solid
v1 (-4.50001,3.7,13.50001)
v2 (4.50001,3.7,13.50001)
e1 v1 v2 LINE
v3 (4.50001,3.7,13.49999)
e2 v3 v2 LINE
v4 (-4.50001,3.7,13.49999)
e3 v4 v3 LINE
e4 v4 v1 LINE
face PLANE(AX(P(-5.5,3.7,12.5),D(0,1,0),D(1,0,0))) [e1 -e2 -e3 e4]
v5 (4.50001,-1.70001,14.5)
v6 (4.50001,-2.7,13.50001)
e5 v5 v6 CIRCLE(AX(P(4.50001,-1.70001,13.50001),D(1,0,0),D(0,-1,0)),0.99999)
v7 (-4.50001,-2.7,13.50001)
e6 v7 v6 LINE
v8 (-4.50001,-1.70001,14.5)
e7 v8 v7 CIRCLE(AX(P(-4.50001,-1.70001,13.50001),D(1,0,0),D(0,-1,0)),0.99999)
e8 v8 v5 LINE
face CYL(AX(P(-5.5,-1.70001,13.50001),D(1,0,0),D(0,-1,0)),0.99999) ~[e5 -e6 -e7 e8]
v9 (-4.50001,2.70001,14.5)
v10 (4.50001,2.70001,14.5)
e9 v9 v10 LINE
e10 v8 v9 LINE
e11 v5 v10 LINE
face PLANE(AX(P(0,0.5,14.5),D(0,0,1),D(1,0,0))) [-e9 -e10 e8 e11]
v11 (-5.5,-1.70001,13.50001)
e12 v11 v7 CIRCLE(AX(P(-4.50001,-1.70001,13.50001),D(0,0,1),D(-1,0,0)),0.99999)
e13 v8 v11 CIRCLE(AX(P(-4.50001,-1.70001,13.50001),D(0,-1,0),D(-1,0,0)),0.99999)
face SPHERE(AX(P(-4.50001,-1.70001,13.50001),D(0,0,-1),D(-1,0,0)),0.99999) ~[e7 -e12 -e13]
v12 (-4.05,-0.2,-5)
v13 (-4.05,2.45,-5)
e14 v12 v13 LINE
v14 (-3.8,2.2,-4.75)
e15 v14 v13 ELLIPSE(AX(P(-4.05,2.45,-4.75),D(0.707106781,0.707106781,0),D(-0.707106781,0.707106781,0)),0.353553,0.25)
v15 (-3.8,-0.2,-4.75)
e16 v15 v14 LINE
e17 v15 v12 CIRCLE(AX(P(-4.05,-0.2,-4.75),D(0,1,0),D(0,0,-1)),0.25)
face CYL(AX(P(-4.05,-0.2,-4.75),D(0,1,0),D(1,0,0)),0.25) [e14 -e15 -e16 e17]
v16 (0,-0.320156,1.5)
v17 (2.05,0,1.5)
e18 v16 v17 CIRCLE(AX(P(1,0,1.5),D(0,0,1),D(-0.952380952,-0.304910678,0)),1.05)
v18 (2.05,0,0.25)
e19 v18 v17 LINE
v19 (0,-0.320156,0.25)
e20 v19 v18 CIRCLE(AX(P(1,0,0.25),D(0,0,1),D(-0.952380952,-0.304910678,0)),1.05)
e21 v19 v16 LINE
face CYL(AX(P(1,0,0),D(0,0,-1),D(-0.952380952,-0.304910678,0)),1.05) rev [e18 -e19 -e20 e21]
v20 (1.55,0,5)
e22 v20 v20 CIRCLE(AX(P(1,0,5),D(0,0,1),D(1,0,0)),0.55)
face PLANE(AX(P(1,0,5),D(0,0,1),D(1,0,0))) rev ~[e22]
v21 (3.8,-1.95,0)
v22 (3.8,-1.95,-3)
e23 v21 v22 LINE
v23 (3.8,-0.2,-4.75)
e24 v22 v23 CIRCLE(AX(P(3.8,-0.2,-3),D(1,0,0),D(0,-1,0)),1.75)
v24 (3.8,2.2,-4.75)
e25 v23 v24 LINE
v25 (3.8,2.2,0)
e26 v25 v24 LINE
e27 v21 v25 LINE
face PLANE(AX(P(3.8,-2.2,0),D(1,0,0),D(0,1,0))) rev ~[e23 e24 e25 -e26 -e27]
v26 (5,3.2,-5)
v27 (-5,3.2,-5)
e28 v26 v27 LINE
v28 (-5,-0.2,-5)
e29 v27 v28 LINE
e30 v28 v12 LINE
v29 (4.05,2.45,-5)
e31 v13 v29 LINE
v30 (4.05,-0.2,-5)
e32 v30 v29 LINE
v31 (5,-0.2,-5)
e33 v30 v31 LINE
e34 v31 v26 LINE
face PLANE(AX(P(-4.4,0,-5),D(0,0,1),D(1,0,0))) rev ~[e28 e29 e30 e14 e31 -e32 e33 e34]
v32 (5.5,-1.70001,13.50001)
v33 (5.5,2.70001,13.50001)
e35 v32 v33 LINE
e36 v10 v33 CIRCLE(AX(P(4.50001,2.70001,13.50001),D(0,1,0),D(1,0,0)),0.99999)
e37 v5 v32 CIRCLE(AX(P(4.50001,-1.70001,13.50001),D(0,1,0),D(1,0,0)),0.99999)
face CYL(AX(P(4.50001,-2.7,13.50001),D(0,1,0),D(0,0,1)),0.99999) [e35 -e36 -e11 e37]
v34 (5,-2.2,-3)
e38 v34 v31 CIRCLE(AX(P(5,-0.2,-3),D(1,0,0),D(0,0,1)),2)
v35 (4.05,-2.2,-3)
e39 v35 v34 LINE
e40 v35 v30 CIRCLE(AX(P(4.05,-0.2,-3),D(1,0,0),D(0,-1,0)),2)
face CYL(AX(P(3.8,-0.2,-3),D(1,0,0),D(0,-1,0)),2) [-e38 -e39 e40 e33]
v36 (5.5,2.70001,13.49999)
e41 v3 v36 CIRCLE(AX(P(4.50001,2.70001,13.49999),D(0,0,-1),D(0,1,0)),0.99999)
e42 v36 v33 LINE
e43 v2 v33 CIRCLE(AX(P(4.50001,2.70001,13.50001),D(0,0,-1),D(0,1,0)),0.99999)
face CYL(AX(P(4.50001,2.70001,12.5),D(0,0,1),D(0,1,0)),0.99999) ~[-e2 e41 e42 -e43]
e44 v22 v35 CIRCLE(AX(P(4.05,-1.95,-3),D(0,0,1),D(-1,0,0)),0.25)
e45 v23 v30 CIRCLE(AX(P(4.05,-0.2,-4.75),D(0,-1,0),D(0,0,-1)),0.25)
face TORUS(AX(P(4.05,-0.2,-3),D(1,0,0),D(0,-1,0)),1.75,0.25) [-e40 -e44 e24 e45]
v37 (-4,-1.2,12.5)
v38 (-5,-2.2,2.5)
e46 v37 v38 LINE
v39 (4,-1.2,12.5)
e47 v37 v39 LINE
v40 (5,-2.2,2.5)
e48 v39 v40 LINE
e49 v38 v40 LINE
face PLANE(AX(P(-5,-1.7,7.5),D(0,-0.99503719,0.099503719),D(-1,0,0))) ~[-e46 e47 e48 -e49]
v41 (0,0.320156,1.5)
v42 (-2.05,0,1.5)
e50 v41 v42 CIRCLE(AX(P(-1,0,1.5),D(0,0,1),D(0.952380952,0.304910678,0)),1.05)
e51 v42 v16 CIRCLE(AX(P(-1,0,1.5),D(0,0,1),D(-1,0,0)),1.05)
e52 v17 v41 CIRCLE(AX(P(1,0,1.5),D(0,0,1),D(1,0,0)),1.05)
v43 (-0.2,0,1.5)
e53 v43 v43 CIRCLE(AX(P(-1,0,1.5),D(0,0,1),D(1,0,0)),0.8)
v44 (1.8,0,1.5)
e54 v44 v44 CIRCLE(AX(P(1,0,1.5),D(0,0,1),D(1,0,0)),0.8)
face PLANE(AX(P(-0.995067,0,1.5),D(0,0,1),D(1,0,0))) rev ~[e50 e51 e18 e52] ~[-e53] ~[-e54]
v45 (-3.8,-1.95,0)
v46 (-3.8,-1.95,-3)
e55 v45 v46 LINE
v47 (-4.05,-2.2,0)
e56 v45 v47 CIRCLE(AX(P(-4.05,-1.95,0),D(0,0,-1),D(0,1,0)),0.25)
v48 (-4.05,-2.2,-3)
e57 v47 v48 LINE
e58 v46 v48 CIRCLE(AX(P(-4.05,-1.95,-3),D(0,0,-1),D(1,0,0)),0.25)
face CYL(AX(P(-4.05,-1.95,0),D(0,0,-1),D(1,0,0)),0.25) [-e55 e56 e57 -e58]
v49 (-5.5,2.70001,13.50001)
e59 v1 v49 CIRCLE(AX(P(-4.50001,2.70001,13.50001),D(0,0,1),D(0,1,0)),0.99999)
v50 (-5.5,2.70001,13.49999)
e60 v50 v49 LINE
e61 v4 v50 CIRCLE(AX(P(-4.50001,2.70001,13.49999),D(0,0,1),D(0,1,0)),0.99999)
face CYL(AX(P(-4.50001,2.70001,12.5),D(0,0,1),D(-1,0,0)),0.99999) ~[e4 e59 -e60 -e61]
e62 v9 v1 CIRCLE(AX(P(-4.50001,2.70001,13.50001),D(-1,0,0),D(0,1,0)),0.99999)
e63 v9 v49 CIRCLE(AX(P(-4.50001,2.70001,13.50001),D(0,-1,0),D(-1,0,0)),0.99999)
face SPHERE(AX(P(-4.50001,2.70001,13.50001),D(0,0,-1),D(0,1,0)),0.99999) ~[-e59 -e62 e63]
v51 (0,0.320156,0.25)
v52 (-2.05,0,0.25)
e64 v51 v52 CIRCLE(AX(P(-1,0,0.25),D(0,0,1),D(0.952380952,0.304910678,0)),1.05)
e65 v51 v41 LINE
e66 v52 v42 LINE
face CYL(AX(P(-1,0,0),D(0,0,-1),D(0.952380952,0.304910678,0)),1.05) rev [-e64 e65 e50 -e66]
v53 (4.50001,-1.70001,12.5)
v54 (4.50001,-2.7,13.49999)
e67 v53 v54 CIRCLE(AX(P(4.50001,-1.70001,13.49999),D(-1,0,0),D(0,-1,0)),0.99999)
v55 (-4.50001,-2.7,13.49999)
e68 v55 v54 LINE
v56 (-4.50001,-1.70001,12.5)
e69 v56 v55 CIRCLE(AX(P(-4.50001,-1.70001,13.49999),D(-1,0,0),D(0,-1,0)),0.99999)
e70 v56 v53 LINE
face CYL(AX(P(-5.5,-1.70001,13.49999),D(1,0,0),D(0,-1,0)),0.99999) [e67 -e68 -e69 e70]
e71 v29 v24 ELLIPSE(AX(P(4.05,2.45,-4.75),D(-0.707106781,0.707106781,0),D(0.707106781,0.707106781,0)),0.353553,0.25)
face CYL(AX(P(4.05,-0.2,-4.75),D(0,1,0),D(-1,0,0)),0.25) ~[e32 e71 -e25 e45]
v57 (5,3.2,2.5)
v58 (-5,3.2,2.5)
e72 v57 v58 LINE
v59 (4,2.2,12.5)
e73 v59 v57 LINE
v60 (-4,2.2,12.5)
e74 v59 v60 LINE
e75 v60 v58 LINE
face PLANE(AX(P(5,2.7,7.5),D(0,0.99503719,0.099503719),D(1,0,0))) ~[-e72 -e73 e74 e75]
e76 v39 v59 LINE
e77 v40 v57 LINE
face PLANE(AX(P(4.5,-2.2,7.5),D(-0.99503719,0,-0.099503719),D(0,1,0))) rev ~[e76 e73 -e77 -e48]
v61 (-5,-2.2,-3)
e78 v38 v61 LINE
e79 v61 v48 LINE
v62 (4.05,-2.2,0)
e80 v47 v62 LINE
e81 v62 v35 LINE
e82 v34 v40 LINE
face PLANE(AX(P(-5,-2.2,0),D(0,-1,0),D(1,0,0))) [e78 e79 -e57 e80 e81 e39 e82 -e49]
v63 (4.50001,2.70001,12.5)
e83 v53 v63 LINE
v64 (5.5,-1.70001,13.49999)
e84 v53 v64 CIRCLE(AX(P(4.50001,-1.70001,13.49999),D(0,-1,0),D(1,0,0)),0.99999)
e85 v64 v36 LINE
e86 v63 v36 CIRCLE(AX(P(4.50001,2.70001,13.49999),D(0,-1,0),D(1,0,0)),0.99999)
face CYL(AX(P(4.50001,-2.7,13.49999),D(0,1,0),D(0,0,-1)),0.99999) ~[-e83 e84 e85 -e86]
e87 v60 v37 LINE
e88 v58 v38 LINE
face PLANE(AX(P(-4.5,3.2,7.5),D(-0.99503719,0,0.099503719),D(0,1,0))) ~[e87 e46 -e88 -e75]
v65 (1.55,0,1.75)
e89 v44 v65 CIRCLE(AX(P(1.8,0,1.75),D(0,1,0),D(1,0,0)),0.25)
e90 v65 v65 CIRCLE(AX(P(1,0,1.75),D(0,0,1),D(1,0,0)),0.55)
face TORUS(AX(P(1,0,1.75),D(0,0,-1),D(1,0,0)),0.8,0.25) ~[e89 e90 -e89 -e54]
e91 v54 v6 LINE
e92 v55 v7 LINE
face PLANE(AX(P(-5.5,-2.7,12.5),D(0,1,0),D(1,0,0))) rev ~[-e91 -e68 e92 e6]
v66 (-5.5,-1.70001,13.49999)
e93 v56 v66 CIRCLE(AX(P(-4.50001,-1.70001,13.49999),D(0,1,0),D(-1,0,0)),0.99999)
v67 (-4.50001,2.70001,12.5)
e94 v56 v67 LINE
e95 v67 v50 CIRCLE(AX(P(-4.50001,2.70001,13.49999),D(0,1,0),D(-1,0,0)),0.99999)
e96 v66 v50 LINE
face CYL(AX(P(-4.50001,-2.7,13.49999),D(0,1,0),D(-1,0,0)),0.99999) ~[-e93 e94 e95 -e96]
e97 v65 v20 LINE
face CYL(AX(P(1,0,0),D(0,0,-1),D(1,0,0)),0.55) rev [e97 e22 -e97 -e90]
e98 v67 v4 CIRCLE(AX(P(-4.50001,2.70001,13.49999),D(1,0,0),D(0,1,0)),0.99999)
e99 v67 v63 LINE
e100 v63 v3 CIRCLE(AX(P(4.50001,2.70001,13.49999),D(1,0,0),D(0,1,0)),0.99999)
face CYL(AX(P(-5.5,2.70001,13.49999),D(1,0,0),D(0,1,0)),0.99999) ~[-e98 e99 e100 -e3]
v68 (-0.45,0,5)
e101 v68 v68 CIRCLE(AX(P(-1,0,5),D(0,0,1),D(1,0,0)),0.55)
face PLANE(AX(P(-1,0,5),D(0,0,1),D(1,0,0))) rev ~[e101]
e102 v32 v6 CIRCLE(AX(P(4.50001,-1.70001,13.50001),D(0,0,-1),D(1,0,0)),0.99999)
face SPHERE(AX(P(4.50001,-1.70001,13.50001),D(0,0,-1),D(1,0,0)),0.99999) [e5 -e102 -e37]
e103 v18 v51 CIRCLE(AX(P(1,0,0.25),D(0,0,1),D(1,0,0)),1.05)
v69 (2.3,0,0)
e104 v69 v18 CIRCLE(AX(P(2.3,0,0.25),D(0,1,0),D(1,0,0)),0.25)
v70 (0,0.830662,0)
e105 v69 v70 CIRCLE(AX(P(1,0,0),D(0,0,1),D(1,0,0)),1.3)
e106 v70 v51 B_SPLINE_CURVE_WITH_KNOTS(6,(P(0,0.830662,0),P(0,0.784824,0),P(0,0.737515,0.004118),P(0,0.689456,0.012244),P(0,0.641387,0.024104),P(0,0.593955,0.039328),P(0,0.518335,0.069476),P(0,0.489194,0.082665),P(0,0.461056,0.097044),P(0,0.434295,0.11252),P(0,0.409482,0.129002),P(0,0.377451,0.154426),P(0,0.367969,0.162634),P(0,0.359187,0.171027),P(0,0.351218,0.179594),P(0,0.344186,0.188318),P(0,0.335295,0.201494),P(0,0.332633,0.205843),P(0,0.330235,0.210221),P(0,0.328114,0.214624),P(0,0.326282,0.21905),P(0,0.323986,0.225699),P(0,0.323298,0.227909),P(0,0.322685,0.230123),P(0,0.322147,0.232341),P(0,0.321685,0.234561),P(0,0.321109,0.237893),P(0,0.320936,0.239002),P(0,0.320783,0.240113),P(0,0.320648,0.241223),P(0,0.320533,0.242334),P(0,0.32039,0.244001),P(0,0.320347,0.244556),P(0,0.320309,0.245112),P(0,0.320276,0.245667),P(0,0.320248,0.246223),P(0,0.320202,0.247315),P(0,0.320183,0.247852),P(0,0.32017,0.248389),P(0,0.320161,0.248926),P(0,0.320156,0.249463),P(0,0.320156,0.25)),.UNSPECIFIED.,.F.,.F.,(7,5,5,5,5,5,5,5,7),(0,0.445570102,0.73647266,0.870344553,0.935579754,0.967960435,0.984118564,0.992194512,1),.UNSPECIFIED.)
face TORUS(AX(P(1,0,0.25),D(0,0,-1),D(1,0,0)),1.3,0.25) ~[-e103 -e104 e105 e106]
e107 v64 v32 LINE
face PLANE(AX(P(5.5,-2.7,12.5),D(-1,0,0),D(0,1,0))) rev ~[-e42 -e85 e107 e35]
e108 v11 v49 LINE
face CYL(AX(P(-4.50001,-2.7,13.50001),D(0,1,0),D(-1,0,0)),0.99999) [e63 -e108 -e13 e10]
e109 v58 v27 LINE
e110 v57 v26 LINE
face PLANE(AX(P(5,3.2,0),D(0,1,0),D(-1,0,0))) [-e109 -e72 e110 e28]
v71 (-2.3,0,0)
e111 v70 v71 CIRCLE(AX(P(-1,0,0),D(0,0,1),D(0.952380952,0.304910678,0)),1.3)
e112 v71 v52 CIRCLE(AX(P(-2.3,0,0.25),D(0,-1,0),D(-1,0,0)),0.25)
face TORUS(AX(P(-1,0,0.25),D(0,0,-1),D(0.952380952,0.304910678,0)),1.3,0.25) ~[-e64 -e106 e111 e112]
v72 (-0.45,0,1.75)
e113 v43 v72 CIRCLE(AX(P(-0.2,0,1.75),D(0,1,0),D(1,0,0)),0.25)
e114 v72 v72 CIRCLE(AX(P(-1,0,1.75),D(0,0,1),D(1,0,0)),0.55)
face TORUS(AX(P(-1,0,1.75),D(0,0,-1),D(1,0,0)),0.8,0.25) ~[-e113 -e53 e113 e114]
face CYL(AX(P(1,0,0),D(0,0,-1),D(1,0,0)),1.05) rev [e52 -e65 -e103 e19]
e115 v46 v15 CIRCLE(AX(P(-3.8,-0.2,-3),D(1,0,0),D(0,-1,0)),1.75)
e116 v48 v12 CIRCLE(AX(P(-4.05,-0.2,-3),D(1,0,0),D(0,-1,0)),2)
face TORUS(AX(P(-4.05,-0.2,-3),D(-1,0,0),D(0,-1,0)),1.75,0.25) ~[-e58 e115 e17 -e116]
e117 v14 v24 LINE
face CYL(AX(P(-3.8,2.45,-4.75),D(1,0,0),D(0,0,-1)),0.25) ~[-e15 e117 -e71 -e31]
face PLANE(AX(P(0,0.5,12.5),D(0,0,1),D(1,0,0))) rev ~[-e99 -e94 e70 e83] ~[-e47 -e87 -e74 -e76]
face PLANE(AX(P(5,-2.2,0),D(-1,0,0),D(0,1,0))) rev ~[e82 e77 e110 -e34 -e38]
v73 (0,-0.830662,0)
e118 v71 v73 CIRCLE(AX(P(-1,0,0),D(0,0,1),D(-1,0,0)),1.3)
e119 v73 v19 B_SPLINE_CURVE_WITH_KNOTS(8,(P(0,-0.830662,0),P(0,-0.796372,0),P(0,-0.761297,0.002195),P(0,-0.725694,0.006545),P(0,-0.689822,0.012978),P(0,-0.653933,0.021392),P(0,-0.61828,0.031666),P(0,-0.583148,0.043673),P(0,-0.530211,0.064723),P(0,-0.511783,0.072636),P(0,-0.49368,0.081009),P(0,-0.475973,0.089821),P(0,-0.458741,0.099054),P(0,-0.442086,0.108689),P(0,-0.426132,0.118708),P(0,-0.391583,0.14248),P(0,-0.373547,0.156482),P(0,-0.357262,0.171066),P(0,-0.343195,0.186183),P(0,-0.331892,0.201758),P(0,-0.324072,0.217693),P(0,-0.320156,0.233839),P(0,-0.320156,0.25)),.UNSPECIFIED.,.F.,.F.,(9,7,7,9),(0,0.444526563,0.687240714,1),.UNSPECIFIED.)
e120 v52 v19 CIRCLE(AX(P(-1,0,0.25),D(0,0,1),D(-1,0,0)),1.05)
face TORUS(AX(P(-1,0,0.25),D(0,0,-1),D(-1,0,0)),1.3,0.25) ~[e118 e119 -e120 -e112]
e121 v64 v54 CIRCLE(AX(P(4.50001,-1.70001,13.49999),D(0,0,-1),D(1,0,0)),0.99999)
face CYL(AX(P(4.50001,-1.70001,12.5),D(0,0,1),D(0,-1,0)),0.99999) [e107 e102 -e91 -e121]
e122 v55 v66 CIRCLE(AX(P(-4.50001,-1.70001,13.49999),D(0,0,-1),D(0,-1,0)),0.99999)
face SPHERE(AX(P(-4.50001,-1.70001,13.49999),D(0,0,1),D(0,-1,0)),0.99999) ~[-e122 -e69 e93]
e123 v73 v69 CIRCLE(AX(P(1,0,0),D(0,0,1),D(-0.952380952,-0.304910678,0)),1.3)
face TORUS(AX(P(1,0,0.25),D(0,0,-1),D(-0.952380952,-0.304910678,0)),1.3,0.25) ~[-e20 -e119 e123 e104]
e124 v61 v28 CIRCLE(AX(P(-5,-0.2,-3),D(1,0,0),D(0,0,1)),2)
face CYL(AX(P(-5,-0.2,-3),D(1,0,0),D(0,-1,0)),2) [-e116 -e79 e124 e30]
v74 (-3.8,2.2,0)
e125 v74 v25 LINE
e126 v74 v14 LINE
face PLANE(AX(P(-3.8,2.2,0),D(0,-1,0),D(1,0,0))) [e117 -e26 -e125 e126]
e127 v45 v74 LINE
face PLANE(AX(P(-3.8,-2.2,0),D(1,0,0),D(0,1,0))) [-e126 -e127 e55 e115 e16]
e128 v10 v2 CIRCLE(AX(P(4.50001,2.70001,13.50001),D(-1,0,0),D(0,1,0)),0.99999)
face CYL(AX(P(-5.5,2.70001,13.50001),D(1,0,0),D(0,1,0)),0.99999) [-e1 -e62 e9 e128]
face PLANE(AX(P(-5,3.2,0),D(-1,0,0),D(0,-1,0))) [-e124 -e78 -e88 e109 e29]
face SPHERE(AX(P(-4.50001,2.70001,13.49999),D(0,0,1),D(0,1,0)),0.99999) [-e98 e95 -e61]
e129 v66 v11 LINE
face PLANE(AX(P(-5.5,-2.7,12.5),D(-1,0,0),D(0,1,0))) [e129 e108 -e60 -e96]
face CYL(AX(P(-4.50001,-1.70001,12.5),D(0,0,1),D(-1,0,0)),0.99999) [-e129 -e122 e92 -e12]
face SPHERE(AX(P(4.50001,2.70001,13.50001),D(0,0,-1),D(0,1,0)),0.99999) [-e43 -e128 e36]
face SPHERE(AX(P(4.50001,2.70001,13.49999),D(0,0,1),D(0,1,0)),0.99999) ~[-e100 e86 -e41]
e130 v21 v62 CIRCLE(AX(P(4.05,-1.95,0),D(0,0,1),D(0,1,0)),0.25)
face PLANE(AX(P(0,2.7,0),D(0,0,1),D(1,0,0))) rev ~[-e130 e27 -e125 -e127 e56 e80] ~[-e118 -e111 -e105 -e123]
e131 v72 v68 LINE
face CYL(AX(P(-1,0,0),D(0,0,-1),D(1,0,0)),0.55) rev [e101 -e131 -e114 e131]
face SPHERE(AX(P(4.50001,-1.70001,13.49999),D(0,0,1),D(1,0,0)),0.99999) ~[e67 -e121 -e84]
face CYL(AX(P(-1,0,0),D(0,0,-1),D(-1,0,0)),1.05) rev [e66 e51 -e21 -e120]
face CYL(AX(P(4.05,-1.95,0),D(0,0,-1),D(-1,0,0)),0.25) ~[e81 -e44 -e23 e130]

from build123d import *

# Parameters (mm, degrees)
F0_W     = 1.2
F0_H     = 4.4
F0_W_2   = 7.6
F0_R     = 0.55
F1_DEPTH = 12.5
F2_DEPTH = 5
F3_DEPTH = 1.5
F4_DEPTH = 5
F5_R     = 2
F6_R     = 0.25
F7_SIZE2 = 10
F7_SIZE  = 1
F8_W     = 11.0000001401
F8_H     = 6.4000001401
F8_W_2   = 8
F8_H_2   = 3.4
F9_DEPTH = 2
F10_R    = 0.99999


# Not quite as in the source:
# - a fillet or chamfer is up to 0.001 mm smaller than in the source, because OpenCascade refuses the exact size


with BuildPart() as f1:
    # F0 (on Top) → F1 (new body)
    with BuildSketch(Plane.XY):
        Polygon((-5, 2.2), (-3.8, 2.2), (3.8, 2.2), (5, 2.2), (5, 3.2), (-5, 3.2), align=None)
        with Locations((-4.4, 0)):
            Rectangle(F0_W, F0_H)
        Rectangle(F0_W_2, F0_H)
        with BuildLine():
            Line((2.05, 1.05), (2.05, 0))
            Line((2.05, 0), (2.05, -1.05))
            ThreePointArc((2.05, -1.05), (2.2267766953, -1.4767766953), (1.8, -1.3))
            Line((1.8, -1.3), (-1.8, -1.3))
            ThreePointArc((-1.8, -1.3), (-2.2267766953, -1.4767766953), (-2.05, -1.05))
            Line((-2.05, -1.05), (-2.05, 0))
            Line((-2.05, 0), (-2.05, 1.05))
            ThreePointArc((-2.05, 1.05), (-2.2267766953, 1.4767766953), (-1.8, 1.3))
            Line((-1.8, 1.3), (1.8, 1.3))
            ThreePointArc((1.8, 1.3), (2.2267766953, 1.4767766953), (2.05, 1.05))
        make_face(mode=Mode.SUBTRACT)
        with Locations((4.4, 0)):
            Rectangle(F0_W, F0_H)
        with BuildLine():
            ThreePointArc((0, 0.3201562119), (1.1620185175, 1.0374246961), (2.05, 0))
            Line((2.05, 0), (2.05, 1.05))
            ThreePointArc((2.05, 1.05), (2.2267766953, 1.4767766953), (1.8, 1.3))
            Line((1.8, 1.3), (-1.8, 1.3))
            ThreePointArc((-1.8, 1.3), (-2.2267766953, 1.4767766953), (-2.05, 1.05))
            Line((-2.05, 1.05), (-2.05, 0))
            ThreePointArc((-2.05, 0), (-1.1620185175, 1.0374246961), (0, 0.3201562119))
        make_face()
        with BuildLine():
            Line((2.05, -1.05), (2.05, 0))
            ThreePointArc((2.05, 0), (1.1620185175, -1.0374246961), (0, -0.3201562119))
            ThreePointArc((0, -0.3201562119), (-1.1620185175, -1.0374246961), (-2.05, 0))
            Line((-2.05, 0), (-2.05, -1.05))
            ThreePointArc((-2.05, -1.05), (-2.2267766953, -1.4767766953), (-1.8, -1.3))
            Line((-1.8, -1.3), (1.8, -1.3))
            ThreePointArc((1.8, -1.3), (2.2267766953, -1.4767766953), (2.05, -1.05))
        make_face()
        with BuildLine():
            ThreePointArc((0, -0.3201562119), (-0.05, 0), (0, 0.3201562119))
            ThreePointArc((0, 0.3201562119), (-1.1620185175, 1.0374246961), (-2.05, 0))
            ThreePointArc((-2.05, 0), (-1.1620185175, -1.0374246961), (0, -0.3201562119))
        make_face()
        with Locations((-1, 0)):
            Circle(F0_R, mode=Mode.SUBTRACT)
        with BuildLine():
            ThreePointArc((0, -0.3201562119), (1.1620185175, -1.0374246961), (2.05, 0))
            ThreePointArc((2.05, 0), (1.1620185175, 1.0374246961), (0, 0.3201562119))
            ThreePointArc((0, 0.3201562119), (0.0374246961, 0.1620185175), (0.05, 0))
            ThreePointArc((0.05, 0), (0.0374246961, -0.1620185175), (0, -0.3201562119))
        make_face()
        with Locations((1, 0)):
            Circle(F0_R, mode=Mode.SUBTRACT)
        with Locations((-1, 0)):
            Circle(F0_R)
        with Locations((1, 0)):
            Circle(F0_R)
        with BuildLine():
            ThreePointArc((0.05, 0), (0.0374246961, 0.1620185175), (0, 0.3201562119))
            ThreePointArc((0, 0.3201562119), (-0.05, 0), (0, -0.3201562119))
            ThreePointArc((0, -0.3201562119), (0.0374246961, -0.1620185175), (0.05, 0))
        make_face()
    extrude(amount=F1_DEPTH)

    # F0 (on Top) → F2 (join)
    with BuildSketch(Plane.XY):
        with Locations((-4.4, 0)):
            Rectangle(F0_W, F0_H)
        with Locations((4.4, 0)):
            Rectangle(F0_W, F0_H)
        Polygon((-5, 2.2), (-3.8, 2.2), (3.8, 2.2), (5, 2.2), (5, 3.2), (-5, 3.2), align=None)
    extrude(amount=-F2_DEPTH)

    # F0 (on Top) → F3 (cut)
    with BuildSketch(Plane.XY):
        with BuildLine():
            ThreePointArc((0, -0.3201562119), (-0.05, 0), (0, 0.3201562119))
            ThreePointArc((0, 0.3201562119), (-1.1620185175, 1.0374246961), (-2.05, 0))
            ThreePointArc((-2.05, 0), (-1.1620185175, -1.0374246961), (0, -0.3201562119))
        make_face()
        with Locations((-1, 0)):
            Circle(F0_R, mode=Mode.SUBTRACT)
        with BuildLine():
            ThreePointArc((0, -0.3201562119), (1.1620185175, -1.0374246961), (2.05, 0))
            ThreePointArc((2.05, 0), (1.1620185175, 1.0374246961), (0, 0.3201562119))
            ThreePointArc((0, 0.3201562119), (0.0374246961, 0.1620185175), (0.05, 0))
            ThreePointArc((0.05, 0), (0.0374246961, -0.1620185175), (0, -0.3201562119))
        make_face()
        with Locations((1, 0)):
            Circle(F0_R, mode=Mode.SUBTRACT)
        with BuildLine():
            ThreePointArc((0.05, 0), (0.0374246961, 0.1620185175), (0, 0.3201562119))
            ThreePointArc((0, 0.3201562119), (-0.05, 0), (0, -0.3201562119))
            ThreePointArc((0, -0.3201562119), (0.0374246961, -0.1620185175), (0.05, 0))
        make_face()
    extrude(amount=F3_DEPTH, mode=Mode.SUBTRACT)

    # F0 (on Top) → F4 (cut)
    with BuildSketch(Plane.XY):
        with Locations((-1, 0)):
            Circle(F0_R)
        with Locations((1, 0)):
            Circle(F0_R)
    extrude(amount=F4_DEPTH, mode=Mode.SUBTRACT)

    # F5
    f5_edges = [f1.edges().sort_by_distance(p)[0] for p in [
        (4.4, -2.2, -5),
        (-4.4, -2.2, -5),
    ]]
    fillet(f5_edges, radius=F5_R)

    # F6
    f6_edges = [f1.edges().sort_by_distance(p)[0] for p in [
        (0.45, 0, 1.5),
        (2.05, 0, 0),
        (-1.55, 0, 1.5),
        (-2.05, 0, 0),
        (-3.8, 1, -5),
        (0, 2.2, -5),
        (3.8, 1, -5),
        (-3.8, -2.2, -1.5),
        (3.8, -2.2, -1.5),
    ]]
    fillet(f6_edges, radius=F6_R)

    # F7
    f7_edges = [f1.edges().sort_by_distance(p)[0] for p in [
        (0, -2.2, 12.5),
        (-5, 0.5, 12.5),
        (5, 0.5, 12.5),
        (0, 3.2, 12.5),
    ]]
    f7_side = f1.faces().sort_by_distance((0, 0.5, 12.5))[0]
    chamfer(f7_edges, length=F7_SIZE, length2=F7_SIZE2, reference=f7_side)

    # F8 (on face) → F9 (join)
    with BuildSketch(Plane.XY.offset(12.5)):
        with Locations((0, 0.5)):
            Rectangle(F8_W, F8_H)
        with Locations((0, 0.5)):
            Rectangle(F8_W_2, F8_H_2, mode=Mode.SUBTRACT)
        with Locations((0, 0.5)):
            Rectangle(F8_W_2, F8_H_2)
    extrude(amount=F9_DEPTH)

    # F10 (radius 1 in the source; OpenCascade refuses exactly that, so slightly less here)
    f10_edges = [f1.edges().sort_by_distance(p)[0] for p in [
        (5.5, -2.7, 13.5),
        (-5.5, -2.7, 13.5),
        (5.5, 3.7, 13.5),
        (-5.5, 3.7, 13.5),
        (0, 3.7, 12.5),
        (0, 3.7, 14.5),
        (-5.5, 0.5, 14.5),
        (5.5, 0.5, 14.5),
        (0, -2.7, 14.5),
        (5.5, 0.5, 12.5),
        (0, -2.7, 12.5),
        (-5.5, 0.5, 12.5),
    ]]
    fillet(f10_edges, radius=F10_R)


solid = f1.part
